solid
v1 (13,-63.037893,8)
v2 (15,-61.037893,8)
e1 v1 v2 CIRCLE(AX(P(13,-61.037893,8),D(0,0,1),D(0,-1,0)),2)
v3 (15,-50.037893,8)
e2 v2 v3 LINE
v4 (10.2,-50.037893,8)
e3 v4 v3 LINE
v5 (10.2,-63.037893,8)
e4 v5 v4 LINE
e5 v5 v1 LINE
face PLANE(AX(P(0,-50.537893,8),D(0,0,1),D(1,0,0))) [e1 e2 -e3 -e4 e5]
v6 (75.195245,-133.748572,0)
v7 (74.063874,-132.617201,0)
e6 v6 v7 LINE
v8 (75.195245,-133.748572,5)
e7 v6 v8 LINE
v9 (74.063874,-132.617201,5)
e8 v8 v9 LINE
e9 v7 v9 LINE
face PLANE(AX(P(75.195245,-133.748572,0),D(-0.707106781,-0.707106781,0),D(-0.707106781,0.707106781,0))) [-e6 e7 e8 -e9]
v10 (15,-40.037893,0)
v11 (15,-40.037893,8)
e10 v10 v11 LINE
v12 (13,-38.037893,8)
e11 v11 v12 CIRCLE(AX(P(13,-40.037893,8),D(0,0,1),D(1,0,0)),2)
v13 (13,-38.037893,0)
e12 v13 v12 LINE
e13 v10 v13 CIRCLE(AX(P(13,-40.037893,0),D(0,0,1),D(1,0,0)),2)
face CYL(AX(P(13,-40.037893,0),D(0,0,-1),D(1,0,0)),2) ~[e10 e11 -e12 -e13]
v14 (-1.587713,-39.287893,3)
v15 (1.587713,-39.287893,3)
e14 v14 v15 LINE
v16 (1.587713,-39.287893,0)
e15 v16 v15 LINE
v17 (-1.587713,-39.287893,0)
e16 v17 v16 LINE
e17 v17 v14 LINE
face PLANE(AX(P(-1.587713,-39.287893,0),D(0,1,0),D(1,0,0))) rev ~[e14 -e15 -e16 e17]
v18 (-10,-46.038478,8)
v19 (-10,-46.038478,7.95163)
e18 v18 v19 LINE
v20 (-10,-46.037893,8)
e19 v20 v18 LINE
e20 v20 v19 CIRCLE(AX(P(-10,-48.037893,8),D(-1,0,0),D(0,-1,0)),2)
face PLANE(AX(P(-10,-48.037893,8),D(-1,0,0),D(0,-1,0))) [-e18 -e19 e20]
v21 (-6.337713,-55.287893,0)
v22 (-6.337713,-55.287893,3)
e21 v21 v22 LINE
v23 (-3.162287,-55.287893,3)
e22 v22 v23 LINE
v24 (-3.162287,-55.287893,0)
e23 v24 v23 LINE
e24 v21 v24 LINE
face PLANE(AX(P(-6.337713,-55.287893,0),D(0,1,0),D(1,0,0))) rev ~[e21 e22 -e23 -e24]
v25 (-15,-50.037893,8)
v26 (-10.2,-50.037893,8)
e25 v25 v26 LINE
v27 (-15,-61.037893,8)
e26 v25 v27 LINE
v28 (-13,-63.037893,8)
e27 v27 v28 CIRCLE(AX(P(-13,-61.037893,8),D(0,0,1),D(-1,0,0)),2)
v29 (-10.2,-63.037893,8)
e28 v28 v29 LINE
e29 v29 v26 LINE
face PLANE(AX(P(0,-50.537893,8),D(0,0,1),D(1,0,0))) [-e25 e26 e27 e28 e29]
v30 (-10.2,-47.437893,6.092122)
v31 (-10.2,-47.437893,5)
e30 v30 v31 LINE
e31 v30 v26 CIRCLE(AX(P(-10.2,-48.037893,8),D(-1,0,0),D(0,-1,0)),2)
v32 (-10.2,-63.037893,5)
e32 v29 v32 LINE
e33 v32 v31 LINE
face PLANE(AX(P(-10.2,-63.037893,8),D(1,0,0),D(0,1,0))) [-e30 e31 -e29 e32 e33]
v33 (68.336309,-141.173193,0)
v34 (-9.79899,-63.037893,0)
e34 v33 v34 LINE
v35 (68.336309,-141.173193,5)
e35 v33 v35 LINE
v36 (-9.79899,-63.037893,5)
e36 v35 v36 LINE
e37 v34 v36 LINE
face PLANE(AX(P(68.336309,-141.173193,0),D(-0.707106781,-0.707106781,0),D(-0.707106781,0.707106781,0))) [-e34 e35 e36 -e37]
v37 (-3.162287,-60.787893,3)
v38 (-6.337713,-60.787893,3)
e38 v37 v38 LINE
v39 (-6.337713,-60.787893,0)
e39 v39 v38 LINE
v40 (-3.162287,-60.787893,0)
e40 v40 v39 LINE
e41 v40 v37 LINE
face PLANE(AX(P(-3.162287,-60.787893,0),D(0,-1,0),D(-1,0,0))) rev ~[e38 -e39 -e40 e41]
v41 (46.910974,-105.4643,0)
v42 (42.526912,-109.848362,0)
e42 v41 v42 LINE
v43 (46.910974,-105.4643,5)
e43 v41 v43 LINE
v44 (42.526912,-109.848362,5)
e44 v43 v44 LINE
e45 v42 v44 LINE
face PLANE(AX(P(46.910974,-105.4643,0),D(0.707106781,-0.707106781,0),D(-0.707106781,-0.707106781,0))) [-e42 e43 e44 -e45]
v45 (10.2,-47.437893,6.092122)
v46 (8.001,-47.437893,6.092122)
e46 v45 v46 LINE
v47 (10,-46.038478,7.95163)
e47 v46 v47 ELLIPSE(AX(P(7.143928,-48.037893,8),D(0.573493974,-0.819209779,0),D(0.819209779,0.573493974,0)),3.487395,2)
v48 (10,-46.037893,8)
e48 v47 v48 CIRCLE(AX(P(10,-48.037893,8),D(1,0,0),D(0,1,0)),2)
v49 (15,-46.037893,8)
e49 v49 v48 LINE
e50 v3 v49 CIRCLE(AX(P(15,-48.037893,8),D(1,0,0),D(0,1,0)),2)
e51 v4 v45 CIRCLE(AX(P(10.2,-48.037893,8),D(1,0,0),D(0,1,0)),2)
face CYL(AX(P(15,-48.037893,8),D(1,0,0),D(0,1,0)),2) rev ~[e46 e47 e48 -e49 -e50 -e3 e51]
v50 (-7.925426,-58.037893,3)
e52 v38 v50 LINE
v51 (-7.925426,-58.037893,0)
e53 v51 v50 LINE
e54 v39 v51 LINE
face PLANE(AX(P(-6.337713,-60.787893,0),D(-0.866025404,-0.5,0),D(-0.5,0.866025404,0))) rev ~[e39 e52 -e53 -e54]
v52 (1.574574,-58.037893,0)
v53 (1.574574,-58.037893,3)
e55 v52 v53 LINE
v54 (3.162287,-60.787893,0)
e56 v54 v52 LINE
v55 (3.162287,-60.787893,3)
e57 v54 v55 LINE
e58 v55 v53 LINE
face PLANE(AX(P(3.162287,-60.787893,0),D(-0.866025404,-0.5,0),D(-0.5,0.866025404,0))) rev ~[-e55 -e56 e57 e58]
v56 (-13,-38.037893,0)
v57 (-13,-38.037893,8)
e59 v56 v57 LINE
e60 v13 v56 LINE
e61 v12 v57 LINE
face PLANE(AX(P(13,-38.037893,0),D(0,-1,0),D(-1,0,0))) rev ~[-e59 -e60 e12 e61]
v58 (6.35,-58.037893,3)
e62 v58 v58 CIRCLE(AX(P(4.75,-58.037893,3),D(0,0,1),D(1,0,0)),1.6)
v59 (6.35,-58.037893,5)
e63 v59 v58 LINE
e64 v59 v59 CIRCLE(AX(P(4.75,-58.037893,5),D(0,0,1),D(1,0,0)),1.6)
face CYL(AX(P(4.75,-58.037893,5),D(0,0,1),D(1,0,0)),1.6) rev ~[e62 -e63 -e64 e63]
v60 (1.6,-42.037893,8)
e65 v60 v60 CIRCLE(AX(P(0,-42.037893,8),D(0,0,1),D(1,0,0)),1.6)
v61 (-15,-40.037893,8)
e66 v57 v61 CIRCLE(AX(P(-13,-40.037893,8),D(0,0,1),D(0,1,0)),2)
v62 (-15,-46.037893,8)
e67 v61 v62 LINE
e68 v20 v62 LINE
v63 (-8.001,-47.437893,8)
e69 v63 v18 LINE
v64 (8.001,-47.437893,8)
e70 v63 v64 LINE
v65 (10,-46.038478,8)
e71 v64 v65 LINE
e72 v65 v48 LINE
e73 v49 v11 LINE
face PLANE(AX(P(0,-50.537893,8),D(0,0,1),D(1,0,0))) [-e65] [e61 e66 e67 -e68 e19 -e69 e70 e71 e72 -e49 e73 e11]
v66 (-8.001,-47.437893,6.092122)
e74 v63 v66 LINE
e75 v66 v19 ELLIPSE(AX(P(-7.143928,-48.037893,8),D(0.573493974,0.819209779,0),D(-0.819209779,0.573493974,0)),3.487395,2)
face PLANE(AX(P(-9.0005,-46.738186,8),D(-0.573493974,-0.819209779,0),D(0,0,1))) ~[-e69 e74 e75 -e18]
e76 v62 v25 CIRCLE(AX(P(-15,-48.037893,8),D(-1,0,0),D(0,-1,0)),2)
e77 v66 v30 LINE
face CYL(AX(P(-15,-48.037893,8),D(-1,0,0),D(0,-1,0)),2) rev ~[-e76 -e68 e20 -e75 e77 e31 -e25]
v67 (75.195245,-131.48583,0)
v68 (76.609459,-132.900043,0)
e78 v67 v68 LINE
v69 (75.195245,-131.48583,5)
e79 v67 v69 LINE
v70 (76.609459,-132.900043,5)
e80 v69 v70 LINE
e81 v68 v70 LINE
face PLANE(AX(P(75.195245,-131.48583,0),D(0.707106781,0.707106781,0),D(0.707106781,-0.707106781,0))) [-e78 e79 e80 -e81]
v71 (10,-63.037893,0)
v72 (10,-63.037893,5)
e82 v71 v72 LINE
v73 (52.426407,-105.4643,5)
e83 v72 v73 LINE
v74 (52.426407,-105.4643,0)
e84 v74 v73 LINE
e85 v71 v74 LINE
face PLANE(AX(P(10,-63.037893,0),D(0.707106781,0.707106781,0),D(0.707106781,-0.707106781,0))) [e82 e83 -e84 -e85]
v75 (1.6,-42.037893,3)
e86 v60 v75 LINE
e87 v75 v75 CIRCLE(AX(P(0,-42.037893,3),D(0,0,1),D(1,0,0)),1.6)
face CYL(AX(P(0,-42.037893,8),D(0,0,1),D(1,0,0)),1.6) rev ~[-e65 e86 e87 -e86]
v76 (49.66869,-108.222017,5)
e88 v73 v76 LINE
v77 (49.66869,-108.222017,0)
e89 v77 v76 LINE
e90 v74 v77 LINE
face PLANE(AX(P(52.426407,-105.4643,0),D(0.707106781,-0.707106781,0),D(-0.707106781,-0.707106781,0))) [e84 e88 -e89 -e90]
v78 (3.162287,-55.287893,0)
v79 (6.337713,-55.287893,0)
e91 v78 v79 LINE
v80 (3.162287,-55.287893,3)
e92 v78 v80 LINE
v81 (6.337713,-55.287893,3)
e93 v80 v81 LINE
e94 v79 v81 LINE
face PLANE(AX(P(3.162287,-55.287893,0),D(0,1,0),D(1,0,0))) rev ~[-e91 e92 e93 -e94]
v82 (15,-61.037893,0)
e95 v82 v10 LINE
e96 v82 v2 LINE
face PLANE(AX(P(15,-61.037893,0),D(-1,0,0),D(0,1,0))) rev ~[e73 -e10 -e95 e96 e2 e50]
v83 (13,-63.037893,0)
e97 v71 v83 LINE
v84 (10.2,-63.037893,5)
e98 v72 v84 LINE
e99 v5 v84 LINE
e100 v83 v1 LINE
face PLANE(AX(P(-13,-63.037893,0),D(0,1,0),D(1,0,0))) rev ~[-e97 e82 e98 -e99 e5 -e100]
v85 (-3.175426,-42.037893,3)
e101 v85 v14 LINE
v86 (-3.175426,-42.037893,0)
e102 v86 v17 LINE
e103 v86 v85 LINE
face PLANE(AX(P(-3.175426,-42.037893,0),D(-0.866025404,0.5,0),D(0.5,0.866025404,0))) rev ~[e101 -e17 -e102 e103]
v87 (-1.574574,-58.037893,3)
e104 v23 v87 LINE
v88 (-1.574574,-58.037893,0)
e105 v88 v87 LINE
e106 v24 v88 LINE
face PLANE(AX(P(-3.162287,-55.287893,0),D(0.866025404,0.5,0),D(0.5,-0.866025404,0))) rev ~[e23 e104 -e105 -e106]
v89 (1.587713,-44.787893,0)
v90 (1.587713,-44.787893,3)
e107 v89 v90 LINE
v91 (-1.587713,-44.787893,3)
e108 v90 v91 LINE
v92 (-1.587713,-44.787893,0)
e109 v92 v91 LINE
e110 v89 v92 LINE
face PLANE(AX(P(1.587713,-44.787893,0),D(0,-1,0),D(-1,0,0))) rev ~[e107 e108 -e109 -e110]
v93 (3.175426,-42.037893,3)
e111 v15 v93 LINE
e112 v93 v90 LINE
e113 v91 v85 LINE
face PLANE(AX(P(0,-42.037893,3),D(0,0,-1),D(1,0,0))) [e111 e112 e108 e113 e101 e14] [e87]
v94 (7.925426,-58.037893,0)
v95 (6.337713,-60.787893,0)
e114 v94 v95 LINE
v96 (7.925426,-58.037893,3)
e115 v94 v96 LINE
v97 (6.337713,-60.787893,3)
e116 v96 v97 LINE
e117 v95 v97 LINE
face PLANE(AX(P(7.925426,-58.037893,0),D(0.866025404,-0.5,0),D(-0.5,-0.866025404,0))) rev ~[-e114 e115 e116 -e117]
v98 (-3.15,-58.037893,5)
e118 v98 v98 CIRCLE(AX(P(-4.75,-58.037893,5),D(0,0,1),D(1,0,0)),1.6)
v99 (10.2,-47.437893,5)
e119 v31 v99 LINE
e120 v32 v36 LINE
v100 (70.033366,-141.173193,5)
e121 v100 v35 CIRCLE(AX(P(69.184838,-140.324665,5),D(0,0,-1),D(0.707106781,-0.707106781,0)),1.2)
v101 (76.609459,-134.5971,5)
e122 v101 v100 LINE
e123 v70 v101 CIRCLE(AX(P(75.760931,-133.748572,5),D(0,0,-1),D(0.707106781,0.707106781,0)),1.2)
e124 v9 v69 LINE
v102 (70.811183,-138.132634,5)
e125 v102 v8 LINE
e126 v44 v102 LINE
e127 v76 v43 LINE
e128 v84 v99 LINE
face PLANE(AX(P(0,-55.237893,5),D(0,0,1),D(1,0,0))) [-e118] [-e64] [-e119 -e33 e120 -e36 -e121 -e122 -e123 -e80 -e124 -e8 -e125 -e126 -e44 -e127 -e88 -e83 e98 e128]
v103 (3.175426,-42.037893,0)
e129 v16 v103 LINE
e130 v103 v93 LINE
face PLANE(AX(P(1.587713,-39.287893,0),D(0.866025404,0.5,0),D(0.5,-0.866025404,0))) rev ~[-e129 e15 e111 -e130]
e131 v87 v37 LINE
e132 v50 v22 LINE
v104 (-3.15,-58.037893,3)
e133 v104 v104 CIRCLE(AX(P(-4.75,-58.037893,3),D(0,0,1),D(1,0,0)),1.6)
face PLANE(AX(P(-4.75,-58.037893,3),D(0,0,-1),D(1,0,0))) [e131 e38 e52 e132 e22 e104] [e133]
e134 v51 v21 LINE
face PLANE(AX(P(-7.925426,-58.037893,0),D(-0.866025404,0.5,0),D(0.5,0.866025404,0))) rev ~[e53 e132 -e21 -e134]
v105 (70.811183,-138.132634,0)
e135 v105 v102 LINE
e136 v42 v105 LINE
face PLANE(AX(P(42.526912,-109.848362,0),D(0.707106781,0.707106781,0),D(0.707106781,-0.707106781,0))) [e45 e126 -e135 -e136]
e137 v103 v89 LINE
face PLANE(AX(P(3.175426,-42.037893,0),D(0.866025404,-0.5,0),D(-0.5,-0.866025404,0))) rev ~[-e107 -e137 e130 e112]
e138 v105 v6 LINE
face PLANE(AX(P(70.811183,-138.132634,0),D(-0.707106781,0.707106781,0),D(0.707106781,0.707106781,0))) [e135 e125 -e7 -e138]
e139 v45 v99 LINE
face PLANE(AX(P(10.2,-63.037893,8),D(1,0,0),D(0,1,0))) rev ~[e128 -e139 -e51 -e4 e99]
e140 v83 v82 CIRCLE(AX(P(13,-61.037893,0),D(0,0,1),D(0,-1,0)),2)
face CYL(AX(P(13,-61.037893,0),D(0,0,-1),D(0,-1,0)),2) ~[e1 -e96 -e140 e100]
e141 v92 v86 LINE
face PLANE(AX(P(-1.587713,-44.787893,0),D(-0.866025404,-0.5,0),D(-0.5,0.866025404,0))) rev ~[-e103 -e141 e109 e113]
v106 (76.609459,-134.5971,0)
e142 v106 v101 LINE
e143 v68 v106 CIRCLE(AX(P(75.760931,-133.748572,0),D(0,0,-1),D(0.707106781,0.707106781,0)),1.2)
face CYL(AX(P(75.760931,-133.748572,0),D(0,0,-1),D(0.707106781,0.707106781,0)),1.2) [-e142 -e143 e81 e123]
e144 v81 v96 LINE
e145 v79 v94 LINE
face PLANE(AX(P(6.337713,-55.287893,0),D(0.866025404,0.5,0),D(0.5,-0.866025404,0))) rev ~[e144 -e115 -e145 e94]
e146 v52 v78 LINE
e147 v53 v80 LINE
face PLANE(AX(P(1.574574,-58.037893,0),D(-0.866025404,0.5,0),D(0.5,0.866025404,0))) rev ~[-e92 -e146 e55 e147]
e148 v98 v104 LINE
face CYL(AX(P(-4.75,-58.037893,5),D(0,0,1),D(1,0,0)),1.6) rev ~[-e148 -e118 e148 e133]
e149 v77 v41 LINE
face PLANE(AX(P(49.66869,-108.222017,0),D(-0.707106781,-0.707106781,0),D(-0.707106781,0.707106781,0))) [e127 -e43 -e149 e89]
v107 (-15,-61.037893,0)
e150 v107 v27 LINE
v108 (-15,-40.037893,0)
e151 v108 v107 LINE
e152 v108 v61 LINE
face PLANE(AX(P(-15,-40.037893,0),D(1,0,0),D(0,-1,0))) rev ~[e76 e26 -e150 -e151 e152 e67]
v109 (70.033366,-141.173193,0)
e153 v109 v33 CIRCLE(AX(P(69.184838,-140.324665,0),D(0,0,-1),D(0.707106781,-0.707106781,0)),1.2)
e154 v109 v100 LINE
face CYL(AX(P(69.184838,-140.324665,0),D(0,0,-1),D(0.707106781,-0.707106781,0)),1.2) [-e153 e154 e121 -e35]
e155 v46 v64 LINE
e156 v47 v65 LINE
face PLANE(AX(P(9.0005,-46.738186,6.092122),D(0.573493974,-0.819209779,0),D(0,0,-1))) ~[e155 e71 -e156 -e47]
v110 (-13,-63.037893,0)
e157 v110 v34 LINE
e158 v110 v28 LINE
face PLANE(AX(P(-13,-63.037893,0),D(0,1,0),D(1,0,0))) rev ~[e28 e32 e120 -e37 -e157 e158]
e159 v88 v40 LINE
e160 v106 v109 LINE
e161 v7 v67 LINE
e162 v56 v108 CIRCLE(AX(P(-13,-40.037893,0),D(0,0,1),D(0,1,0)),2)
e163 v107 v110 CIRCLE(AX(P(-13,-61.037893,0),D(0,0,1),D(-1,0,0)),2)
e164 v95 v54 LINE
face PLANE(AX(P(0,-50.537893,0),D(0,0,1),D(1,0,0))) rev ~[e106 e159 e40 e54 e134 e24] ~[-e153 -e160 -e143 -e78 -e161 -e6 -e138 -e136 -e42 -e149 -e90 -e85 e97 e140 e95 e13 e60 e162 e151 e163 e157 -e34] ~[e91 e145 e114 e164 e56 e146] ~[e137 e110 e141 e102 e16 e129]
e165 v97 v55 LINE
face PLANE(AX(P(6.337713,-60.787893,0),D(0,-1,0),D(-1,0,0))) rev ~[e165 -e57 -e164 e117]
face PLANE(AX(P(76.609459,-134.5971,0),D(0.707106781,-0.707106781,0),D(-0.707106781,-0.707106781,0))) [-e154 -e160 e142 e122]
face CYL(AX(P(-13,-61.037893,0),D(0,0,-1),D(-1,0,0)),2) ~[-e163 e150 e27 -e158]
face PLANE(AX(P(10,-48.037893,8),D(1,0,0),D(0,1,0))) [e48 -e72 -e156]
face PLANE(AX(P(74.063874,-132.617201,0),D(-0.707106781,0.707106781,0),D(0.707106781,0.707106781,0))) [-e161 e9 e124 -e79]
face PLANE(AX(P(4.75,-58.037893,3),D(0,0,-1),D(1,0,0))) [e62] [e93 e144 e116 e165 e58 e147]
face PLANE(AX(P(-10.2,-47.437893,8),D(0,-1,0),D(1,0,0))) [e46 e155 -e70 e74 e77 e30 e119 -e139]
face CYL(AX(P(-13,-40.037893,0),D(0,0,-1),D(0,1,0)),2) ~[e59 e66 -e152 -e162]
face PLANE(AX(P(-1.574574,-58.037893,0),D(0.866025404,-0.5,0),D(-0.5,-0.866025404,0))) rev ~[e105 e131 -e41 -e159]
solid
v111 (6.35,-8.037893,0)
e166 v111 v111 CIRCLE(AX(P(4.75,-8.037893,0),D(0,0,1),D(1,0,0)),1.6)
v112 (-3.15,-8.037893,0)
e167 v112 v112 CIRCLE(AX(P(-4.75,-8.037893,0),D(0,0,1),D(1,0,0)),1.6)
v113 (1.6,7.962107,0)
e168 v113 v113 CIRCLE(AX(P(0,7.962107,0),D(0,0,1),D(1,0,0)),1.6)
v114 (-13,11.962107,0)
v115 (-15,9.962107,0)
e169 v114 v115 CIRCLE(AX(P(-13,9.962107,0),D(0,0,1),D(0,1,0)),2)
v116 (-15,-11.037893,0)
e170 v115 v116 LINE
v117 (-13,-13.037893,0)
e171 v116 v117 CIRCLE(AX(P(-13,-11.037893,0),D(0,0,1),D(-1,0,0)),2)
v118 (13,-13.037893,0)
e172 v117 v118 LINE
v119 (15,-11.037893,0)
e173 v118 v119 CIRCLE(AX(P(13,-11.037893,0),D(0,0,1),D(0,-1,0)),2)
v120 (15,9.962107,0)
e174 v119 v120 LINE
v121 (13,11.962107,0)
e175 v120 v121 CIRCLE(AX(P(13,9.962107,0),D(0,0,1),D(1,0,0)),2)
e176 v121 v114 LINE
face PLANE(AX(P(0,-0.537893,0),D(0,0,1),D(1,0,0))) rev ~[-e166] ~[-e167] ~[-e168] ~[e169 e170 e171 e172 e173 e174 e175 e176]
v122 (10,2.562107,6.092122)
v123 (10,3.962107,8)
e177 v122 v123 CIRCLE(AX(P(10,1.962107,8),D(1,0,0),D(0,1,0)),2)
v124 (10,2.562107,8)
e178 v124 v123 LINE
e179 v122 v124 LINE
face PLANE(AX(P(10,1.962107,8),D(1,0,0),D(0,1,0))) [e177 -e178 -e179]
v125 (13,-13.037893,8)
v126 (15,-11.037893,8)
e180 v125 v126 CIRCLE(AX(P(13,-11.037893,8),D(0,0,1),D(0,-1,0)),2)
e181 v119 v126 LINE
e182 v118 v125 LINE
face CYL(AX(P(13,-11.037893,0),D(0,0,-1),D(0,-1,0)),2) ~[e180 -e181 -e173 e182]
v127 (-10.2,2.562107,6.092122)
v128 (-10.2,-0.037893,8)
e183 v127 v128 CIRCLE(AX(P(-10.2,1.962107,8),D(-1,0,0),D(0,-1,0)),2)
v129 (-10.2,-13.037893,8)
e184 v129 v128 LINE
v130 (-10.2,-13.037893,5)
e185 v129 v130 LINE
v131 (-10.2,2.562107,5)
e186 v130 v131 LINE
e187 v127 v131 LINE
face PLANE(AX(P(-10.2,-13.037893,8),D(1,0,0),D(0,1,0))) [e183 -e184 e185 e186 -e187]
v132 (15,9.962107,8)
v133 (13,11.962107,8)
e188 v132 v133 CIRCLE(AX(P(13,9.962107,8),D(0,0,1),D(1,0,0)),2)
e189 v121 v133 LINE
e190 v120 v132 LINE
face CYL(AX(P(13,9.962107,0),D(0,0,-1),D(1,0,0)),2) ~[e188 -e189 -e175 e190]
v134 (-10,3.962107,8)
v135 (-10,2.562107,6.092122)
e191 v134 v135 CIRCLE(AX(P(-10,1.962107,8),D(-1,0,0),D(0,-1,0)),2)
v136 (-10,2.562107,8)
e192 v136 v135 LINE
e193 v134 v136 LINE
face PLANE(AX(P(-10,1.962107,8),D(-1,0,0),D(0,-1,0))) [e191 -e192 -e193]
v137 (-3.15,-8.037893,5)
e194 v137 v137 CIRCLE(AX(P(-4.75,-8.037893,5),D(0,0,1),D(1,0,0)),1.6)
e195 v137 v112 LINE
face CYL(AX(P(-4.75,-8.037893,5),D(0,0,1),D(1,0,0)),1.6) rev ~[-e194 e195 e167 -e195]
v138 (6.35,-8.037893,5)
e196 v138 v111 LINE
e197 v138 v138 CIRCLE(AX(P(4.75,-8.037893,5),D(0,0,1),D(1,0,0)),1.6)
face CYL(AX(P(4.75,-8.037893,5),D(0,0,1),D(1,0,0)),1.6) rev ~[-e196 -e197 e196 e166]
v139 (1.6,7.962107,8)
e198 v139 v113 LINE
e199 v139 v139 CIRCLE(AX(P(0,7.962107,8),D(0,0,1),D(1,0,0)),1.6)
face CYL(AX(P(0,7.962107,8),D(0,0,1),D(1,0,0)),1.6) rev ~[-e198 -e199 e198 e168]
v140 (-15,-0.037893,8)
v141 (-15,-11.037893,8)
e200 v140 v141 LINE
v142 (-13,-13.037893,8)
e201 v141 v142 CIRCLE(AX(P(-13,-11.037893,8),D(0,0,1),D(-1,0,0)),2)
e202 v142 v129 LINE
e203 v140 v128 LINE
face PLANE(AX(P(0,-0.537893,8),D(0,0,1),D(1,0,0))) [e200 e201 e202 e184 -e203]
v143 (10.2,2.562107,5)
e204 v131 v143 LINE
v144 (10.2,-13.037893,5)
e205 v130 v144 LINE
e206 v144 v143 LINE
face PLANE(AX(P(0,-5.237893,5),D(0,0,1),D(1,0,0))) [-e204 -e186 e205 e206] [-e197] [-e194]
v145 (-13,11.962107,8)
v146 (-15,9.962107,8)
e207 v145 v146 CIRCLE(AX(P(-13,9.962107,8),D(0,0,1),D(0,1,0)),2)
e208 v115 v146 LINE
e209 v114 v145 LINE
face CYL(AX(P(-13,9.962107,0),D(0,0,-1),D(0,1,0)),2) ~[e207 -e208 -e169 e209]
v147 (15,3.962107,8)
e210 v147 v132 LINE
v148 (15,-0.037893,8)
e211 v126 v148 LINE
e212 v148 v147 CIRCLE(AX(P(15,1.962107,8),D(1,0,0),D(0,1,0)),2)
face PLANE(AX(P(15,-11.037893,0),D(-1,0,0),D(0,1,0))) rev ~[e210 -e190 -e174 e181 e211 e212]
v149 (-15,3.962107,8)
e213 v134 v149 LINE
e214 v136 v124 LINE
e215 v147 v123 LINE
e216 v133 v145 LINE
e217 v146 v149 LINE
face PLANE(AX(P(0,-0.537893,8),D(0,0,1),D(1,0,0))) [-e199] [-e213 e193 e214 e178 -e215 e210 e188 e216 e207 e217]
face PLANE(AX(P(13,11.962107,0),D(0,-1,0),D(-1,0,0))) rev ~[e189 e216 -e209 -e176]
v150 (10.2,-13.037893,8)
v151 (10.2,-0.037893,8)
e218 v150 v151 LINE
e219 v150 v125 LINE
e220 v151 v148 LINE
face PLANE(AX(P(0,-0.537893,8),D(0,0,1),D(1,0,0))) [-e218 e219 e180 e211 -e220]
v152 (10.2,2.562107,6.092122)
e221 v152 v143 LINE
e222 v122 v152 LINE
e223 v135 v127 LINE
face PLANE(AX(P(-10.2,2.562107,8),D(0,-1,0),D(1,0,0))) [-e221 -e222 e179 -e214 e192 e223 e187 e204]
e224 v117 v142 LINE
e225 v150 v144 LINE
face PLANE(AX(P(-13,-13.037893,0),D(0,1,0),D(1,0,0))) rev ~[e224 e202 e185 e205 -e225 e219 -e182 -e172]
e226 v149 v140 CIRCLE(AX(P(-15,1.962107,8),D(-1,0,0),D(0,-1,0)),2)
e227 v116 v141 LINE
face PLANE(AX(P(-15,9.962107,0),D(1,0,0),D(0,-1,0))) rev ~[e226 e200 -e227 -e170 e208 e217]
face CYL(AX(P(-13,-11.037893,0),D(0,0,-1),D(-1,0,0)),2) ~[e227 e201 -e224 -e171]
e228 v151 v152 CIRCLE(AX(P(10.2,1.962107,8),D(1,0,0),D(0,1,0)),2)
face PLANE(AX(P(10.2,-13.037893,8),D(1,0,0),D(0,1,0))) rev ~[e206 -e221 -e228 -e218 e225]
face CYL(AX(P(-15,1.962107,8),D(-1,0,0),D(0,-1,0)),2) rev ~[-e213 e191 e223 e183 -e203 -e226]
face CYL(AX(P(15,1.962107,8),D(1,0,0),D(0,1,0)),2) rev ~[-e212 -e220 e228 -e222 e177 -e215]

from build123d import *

# Parameters (mm, degrees)
F1_DEPTH  = 8
F2_W      = 20.4
F2_H      = 15.6
F3_DEPTH  = 3
F4_R      = 2
F5_DEPTH  = 5
F6_R      = 2
F7_DEPTH  = 5
F8_R      = 1.6
F9_DEPTH  = 5.001
F10_R     = 1.6
F11_DEPTH = 8.001
F14_DEPTH = 3
F16_DEPTH = 5
F17_SIZE2 = 1.399415
F17_SIZE  = 1.999
F18_SIZE2 = 1.399415
F18_SIZE  = 1.999


# Not quite as in the source:
# - a fillet or chamfer is up to 0.001 mm smaller than in the source, because OpenCascade refuses the exact size


with BuildPart() as f1:
    # F0 (on Top) → F1 (new body)
    with BuildSketch(Plane.XY):
        with BuildLine():
            Line((13, 11.9621065401), (-13, 11.9621065401))
            ThreePointArc((-13, 11.9621065401), (-14.4142135624, 11.3763201025), (-15, 9.9621065401))
            Line((-15, 9.9621065401), (-15, -11.0378934599))
            ThreePointArc((-15, -11.0378934599), (-14.4142135624, -12.4521070223), (-13, -13.0378934599))
            Line((-13, -13.0378934599), (13, -13.0378934599))
            ThreePointArc((13, -13.0378934599), (14.4142135624, -12.4521070223), (15, -11.0378934599))
            Line((15, -11.0378934599), (15, 9.9621065401))
            ThreePointArc((15, 9.9621065401), (14.4142135624, 11.3763201025), (13, 11.9621065401))
        make_face()
    extrude(amount=F1_DEPTH)

    # F2 (on face) → F3 (cut)
    with BuildSketch(Plane.XY.offset(8)):
        with Locations((0, -5.2378934599)):
            Rectangle(F2_W, F2_H)
    extrude(amount=-F3_DEPTH, mode=Mode.SUBTRACT)

    # F4 (on face) → F5 (cut)
    with BuildSketch(Plane.YZ.offset(15)):
        with Locations((1.9621065401, 8)):
            Circle(F4_R)
    extrude(amount=-F5_DEPTH, mode=Mode.SUBTRACT)

    # F6 (on face) → F7 (cut)
    with BuildSketch(Plane(origin=(-15, 0, 0), x_dir=(0, -1, 0), z_dir=(-1, 0, 0))):
        with Locations((-1.9621065401, 8)):
            Circle(F6_R)
    extrude(amount=-F7_DEPTH, mode=Mode.SUBTRACT)

    # F8 (on face) → F9 (cut, through all)
    with BuildSketch(Plane.XY.offset(5)):
        with Locations((-4.75, -8.0378934599)):
            Circle(F8_R)
        with Locations((4.75, -8.0378934599)):
            Circle(F8_R)
    extrude(amount=-F9_DEPTH, mode=Mode.SUBTRACT)

    # F10 (on face) → F11 (cut, through all)
    with BuildSketch(Plane.XY.offset(8)):
        with Locations((0, 7.9621065401)):
            Circle(F10_R)
    extrude(amount=-F11_DEPTH, mode=Mode.SUBTRACT)


with BuildPart() as f12_1:
    # F12: copy of F1
    add(f1.part.moved(Location((0, -50, 0))))

    # F13 (on face) → F14 (cut)
    with BuildSketch(Plane(origin=(0, 0, 0), x_dir=(1, 0, 0), z_dir=(0, 0, -1))):
        Polygon((-3.1622867597, 55.2878934599), (-1.5745735195, 58.0378934599), (-3.1622867597, 60.7878934599), (-6.3377132403, 60.7878934599), (-7.9254264805, 58.0378934599), (-6.3377132403, 55.2878934599), align=None)
        Polygon((6.3377132403, 55.2878934599), (7.9254264805, 58.0378934599), (6.3377132403, 60.7878934599), (3.1622867597, 60.7878934599), (1.5745735195, 58.0378934599), (3.1622867597, 55.2878934599), align=None)
        Polygon((-1.5877132403, 39.2878934599), (1.5877132403, 39.2878934599), (3.1754264805, 42.0378934599), (1.5877132403, 44.7878934599), (-1.5877132403, 44.7878934599), (-3.1754264805, 42.0378934599), align=None)
    extrude(amount=-F14_DEPTH, mode=Mode.SUBTRACT)

    # F15 (on face) → F16 (join)
    with BuildSketch(Plane(origin=(0, 0, 0), x_dir=(1, 0, 0), z_dir=(0, 0, -1))):
        with BuildLine():
            Line((-9.7989898732, 63.0378934599), (10, 63.0378934599))
            Line((10, 63.0378934599), (52.4264068712, 105.4643003311))
            Line((52.4264068712, 105.4643003311), (49.6686904246, 108.2220167777))
            Line((49.6686904246, 108.2220167777), (46.9109739779, 105.4643003311))
            Line((46.9109739779, 105.4643003311), (42.5269119346, 109.8483623745))
            Line((42.5269119346, 109.8483623745), (70.811183182, 138.1326336219))
            Line((70.811183182, 138.1326336219), (75.1952452254, 133.7485715786))
            Line((75.1952452254, 133.7485715786), (74.0638743755, 132.6172007287))
            Line((74.0638743755, 132.6172007287), (75.1952452254, 131.4858298788))
            Line((75.1952452254, 131.4858298788), (76.6094587878, 132.9000434412))
            ThreePointArc((76.6094587878, 132.9000434412), (76.9609306503, 133.7485715786), (76.6094587878, 134.597099716))
            Line((76.6094587878, 134.597099716), (70.0333657227, 141.173192781))
            ThreePointArc((70.0333657227, 141.173192781), (69.1848375853, 141.5246646436), (68.3363094479, 141.173192781))
            Line((68.3363094479, 141.173192781), (-9.7989898732, 63.0378934599))
        make_face()
    extrude(amount=-F16_DEPTH)

    # F17 (size 2 and 1.4004150764 in the source; OpenCascade refuses exactly that, so slightly less here)
    f17_edges = [f12_1.edges().sort_by_distance(p)[0] for p in [
        (-10, -47.437893, 7.046061),
    ]]
    f17_side = f12_1.faces().sort_by_distance((0, -47.437893, 6.493105))[0]
    chamfer(f17_edges, length=F17_SIZE, length2=F17_SIZE2, reference=f17_side)

    # F18 (size 2 and 1.4004150764 in the source; OpenCascade refuses exactly that, so slightly less here)
    f18_edges = [f12_1.edges().sort_by_distance(p)[0] for p in [
        (10, -47.437893, 7.046061),
    ]]
    f18_side = f12_1.faces().sort_by_distance((0.60623, -47.437893, 6.45586))[0]
    chamfer(f18_edges, length=F18_SIZE, length2=F18_SIZE2, reference=f18_side)


solid = Compound([f1.part, f12_1.part])
